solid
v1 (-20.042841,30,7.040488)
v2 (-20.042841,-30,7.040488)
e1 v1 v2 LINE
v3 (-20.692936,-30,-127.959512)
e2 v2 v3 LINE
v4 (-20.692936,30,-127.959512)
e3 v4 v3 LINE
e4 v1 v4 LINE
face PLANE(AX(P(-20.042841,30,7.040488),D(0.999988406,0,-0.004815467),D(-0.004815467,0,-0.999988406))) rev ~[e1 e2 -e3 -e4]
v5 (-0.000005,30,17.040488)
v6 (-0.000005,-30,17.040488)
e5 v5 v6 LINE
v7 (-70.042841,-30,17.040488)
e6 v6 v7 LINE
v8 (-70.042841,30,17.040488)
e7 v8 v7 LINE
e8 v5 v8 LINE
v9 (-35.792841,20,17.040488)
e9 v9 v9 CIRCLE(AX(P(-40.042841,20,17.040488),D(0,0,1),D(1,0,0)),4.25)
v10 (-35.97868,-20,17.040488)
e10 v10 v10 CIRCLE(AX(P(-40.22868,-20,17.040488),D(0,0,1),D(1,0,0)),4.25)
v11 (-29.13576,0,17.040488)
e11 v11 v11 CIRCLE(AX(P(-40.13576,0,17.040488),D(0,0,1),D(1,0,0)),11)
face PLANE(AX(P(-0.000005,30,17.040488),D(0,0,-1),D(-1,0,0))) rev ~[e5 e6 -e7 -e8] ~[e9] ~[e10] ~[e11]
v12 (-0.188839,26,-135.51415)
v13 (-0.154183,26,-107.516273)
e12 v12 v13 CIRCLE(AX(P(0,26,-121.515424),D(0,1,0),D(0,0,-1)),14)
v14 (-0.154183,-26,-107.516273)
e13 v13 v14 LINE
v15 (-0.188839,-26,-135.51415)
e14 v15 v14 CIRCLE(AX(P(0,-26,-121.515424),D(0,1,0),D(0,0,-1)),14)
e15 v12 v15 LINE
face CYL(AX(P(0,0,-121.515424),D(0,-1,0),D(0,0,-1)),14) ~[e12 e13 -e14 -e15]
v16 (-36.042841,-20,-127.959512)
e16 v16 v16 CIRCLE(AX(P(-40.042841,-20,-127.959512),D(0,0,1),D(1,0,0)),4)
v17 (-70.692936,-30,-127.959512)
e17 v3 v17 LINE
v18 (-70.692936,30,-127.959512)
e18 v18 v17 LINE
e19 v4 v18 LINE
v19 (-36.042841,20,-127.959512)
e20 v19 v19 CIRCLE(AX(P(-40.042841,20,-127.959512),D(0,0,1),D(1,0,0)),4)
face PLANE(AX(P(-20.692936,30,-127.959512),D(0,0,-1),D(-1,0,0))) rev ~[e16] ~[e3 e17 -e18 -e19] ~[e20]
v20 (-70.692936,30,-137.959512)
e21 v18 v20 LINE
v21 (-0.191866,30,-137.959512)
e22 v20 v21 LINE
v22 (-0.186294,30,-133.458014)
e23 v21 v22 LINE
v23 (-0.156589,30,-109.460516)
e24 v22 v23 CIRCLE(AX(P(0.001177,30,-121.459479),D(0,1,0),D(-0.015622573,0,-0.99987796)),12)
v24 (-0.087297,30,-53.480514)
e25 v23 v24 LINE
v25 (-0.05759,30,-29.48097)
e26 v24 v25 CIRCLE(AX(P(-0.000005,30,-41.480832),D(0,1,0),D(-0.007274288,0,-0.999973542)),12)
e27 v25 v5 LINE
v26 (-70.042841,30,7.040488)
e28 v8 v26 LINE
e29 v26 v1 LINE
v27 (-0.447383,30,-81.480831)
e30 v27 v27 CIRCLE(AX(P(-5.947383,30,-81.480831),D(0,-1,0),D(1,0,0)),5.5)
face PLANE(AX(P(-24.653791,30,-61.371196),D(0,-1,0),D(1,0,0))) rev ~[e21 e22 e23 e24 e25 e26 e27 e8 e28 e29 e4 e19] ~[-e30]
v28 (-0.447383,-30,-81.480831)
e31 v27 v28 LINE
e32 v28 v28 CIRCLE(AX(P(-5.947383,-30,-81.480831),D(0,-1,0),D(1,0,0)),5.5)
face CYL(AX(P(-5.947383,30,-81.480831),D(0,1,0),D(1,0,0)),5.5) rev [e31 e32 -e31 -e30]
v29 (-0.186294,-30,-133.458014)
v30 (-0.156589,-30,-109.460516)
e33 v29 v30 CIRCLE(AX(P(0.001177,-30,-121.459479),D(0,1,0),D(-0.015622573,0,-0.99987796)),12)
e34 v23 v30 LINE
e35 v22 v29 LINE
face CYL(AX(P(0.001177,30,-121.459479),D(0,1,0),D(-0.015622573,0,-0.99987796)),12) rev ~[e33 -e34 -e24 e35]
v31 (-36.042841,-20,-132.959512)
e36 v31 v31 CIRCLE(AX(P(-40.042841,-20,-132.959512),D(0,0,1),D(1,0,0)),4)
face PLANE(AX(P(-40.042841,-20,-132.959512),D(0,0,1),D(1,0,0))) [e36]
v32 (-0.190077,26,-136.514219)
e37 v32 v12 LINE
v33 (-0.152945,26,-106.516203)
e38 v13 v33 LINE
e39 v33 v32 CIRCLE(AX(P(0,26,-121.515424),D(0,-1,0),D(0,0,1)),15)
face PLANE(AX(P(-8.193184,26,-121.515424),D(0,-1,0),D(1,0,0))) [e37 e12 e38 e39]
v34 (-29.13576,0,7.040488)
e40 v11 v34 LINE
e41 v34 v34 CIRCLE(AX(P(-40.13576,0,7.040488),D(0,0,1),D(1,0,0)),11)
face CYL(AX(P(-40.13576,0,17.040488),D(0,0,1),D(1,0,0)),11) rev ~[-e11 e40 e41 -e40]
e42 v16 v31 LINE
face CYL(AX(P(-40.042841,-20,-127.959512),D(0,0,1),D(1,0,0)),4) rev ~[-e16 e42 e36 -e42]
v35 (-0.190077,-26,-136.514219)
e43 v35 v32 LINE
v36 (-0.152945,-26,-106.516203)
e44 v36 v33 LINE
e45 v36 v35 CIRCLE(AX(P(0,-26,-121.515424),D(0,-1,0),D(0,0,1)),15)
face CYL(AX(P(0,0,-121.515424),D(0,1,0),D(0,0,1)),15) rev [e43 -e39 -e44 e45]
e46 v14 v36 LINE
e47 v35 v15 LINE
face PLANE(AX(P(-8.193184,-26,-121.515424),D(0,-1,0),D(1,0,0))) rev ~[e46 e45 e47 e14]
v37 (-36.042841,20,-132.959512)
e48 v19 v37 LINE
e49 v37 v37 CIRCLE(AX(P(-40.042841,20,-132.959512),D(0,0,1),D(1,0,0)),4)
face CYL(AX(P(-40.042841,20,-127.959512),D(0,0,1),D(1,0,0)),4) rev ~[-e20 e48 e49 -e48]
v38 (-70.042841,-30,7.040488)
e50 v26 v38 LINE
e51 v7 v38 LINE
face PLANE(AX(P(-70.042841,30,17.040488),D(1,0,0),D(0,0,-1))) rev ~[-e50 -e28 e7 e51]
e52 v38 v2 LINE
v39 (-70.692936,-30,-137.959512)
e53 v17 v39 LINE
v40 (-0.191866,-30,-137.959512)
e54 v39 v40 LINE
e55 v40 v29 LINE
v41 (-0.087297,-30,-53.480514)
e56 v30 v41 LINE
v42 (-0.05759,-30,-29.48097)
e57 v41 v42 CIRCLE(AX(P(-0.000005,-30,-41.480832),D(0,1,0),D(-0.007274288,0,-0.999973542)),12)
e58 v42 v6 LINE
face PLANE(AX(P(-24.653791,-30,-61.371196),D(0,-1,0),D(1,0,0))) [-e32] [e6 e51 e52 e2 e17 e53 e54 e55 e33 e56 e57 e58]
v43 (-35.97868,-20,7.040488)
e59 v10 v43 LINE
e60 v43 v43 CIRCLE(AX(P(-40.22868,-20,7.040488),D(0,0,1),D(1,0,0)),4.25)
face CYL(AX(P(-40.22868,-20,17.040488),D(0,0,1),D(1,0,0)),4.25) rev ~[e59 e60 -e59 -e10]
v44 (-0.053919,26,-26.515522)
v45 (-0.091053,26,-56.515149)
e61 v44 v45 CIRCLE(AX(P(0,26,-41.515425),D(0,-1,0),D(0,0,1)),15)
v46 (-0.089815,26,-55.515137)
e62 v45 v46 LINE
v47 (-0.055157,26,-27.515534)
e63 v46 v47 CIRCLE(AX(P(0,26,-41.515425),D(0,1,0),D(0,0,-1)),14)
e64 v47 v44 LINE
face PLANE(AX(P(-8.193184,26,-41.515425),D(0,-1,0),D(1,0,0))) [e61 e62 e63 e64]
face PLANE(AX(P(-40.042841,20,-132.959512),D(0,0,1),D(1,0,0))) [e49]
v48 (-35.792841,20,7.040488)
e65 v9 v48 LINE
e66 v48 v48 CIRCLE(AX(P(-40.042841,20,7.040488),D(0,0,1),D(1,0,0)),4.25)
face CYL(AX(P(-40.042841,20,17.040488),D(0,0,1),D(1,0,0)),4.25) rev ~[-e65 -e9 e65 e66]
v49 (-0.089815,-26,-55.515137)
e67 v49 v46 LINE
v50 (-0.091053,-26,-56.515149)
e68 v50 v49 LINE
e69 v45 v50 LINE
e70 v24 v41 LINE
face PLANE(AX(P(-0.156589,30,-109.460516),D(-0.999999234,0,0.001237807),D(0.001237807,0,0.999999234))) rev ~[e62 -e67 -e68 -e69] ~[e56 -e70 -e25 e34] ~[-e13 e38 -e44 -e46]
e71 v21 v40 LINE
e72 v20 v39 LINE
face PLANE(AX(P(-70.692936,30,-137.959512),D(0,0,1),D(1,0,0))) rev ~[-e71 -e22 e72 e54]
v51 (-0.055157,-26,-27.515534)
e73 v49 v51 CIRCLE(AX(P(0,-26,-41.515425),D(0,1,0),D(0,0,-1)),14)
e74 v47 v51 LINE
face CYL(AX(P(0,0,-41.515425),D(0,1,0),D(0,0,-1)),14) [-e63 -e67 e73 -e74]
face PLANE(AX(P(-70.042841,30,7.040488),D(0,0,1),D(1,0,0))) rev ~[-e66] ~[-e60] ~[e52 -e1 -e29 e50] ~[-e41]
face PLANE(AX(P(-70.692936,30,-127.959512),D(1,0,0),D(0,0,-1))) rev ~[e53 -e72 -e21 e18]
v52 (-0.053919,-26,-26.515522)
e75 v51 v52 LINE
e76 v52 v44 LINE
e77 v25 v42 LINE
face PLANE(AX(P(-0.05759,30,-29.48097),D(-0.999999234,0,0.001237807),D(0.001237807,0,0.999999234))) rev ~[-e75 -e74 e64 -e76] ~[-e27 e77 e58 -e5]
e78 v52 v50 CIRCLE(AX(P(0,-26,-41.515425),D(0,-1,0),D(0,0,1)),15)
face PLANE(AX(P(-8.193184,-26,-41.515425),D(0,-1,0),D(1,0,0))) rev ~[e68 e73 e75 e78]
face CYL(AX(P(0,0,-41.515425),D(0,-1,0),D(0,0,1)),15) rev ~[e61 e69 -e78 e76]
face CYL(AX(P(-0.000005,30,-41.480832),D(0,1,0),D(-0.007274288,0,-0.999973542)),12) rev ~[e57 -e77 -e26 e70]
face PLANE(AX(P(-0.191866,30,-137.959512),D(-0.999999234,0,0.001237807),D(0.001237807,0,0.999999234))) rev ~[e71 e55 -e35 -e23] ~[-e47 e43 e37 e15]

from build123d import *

# Parameters (mm, degrees)
F0_R           = 5.5
F1_DEPTH       = 60
F4_DEPTH       = 26
F4_DEPTH_BACK  = 26
F5_R           = 4
F6_DEPTH       = 5
F7_R           = 4.25
F8_DEPTH       = 15
F9_R           = 11
F10_DEPTH      = 25
F10_DEPTH_BACK = 25


# Not quite as in the source:
# - a feature names something its author has since deleted; it is built from what else it names


with BuildPart() as f1:
    # F0 (on Front) → F1 (new body)
    with BuildSketch(Plane.XZ):
        with BuildLine():
            ThreePointArc((-0.0872969156, -53.4805140133), (-11.9999962709, -41.4659778258), (-0.0575900904, -29.4809696761))
            Line((-0.0575900904, -29.4809696761), (-5.4639e-06, 17.0404876904))
            Line((-5.4639e-06, 17.0404876904), (-70.0428405992, 17.0404876904))
            Line((-70.0428405992, 17.0404876904), (-70.0428405992, 7.0404876904))
            Line((-70.0428405992, 7.0404876904), (-20.0428405992, 7.0404876904))
            Line((-20.0428405992, 7.0404876904), (-20.6929361639, -127.9595123096))
            Line((-20.6929361639, -127.9595123096), (-70.6929361639, -127.9595123096))
            Line((-70.6929361639, -127.9595123096), (-70.6929361639, -137.9595123096))
            Line((-70.6929361639, -137.9595123096), (-0.1918656855, -137.9595123096))
            Line((-0.1918656855, -137.9595123096), (-0.1862936956, -133.4580141387))
            ThreePointArc((-0.1862936956, -133.4580141387), (-11.9988136294, -121.4446249335), (-0.1565894029, -109.4605157571))
            Line((-0.1565894029, -109.4605157571), (-0.0872969156, -53.4805140133))
        make_face()
        with Locations((-5.947382655, -81.4808309078)):
            Circle(F0_R, mode=Mode.SUBTRACT)
    extrude(amount=F1_DEPTH)


with BuildPart() as f1_1:
    # F2: moved
    add(f1.part.moved(Location((0, 30, 0))))

    # F3 (on Front) → F4 (cut, two sides)
    with BuildSketch(Plane.XZ) as f4_sk:
        with BuildLine():
            ThreePointArc((0, -55.5154254436), (-14, -41.5154254436), (0, -27.5154254436))
            Line((0, -27.5154254436), (0, -26.5154254436))
            ThreePointArc((0, -26.5154254436), (-15, -41.5154254436), (0, -56.5154254436))
            Line((0, -56.5154254436), (0, -55.5154254436))
        make_face()
        with BuildLine():
            Line((0, -107.5154236555), (0, -106.5154236555))
            ThreePointArc((0, -106.5154236555), (-15, -121.5154236555), (0, -136.5154236555))
            Line((0, -136.5154236555), (0, -135.5154236555))
            ThreePointArc((0, -135.5154236555), (-14, -121.5154236555), (0, -107.5154236555))
        make_face()
    extrude(amount=F4_DEPTH, mode=Mode.SUBTRACT)
    extrude(f4_sk.sketch, amount=-F4_DEPTH_BACK, mode=Mode.SUBTRACT)

    # F5 (on face) → F6 (cut)
    with BuildSketch(Plane.XY.offset(-127.9595123096)):
        with Locations((-40.0428405992, -20)):
            Circle(F5_R)
        with Locations((-40.0428405992, 20)):
            Circle(F5_R)
    extrude(amount=-F6_DEPTH, mode=Mode.SUBTRACT)

    # F7 (on face) → F8 (cut)
    with BuildSketch(Plane.XY.offset(17.0404876904)):
        with Locations((-40.0428405992, 20)):
            Circle(F7_R)
        with Locations((-40.2286797762, -20)):
            Circle(F7_R)
    extrude(amount=-F8_DEPTH, mode=Mode.SUBTRACT)

    # F9 (on face) → F10 (cut, two sides)
    with BuildSketch(Plane.XY.offset(17.0404876904)) as f10_sk:
        with Locations((-40.1357601877, 0)):
            Circle(F9_R)
    extrude(amount=-F10_DEPTH, mode=Mode.SUBTRACT)
    extrude(f10_sk.sketch, amount=F10_DEPTH_BACK, mode=Mode.SUBTRACT)


solid = f1_1.part
